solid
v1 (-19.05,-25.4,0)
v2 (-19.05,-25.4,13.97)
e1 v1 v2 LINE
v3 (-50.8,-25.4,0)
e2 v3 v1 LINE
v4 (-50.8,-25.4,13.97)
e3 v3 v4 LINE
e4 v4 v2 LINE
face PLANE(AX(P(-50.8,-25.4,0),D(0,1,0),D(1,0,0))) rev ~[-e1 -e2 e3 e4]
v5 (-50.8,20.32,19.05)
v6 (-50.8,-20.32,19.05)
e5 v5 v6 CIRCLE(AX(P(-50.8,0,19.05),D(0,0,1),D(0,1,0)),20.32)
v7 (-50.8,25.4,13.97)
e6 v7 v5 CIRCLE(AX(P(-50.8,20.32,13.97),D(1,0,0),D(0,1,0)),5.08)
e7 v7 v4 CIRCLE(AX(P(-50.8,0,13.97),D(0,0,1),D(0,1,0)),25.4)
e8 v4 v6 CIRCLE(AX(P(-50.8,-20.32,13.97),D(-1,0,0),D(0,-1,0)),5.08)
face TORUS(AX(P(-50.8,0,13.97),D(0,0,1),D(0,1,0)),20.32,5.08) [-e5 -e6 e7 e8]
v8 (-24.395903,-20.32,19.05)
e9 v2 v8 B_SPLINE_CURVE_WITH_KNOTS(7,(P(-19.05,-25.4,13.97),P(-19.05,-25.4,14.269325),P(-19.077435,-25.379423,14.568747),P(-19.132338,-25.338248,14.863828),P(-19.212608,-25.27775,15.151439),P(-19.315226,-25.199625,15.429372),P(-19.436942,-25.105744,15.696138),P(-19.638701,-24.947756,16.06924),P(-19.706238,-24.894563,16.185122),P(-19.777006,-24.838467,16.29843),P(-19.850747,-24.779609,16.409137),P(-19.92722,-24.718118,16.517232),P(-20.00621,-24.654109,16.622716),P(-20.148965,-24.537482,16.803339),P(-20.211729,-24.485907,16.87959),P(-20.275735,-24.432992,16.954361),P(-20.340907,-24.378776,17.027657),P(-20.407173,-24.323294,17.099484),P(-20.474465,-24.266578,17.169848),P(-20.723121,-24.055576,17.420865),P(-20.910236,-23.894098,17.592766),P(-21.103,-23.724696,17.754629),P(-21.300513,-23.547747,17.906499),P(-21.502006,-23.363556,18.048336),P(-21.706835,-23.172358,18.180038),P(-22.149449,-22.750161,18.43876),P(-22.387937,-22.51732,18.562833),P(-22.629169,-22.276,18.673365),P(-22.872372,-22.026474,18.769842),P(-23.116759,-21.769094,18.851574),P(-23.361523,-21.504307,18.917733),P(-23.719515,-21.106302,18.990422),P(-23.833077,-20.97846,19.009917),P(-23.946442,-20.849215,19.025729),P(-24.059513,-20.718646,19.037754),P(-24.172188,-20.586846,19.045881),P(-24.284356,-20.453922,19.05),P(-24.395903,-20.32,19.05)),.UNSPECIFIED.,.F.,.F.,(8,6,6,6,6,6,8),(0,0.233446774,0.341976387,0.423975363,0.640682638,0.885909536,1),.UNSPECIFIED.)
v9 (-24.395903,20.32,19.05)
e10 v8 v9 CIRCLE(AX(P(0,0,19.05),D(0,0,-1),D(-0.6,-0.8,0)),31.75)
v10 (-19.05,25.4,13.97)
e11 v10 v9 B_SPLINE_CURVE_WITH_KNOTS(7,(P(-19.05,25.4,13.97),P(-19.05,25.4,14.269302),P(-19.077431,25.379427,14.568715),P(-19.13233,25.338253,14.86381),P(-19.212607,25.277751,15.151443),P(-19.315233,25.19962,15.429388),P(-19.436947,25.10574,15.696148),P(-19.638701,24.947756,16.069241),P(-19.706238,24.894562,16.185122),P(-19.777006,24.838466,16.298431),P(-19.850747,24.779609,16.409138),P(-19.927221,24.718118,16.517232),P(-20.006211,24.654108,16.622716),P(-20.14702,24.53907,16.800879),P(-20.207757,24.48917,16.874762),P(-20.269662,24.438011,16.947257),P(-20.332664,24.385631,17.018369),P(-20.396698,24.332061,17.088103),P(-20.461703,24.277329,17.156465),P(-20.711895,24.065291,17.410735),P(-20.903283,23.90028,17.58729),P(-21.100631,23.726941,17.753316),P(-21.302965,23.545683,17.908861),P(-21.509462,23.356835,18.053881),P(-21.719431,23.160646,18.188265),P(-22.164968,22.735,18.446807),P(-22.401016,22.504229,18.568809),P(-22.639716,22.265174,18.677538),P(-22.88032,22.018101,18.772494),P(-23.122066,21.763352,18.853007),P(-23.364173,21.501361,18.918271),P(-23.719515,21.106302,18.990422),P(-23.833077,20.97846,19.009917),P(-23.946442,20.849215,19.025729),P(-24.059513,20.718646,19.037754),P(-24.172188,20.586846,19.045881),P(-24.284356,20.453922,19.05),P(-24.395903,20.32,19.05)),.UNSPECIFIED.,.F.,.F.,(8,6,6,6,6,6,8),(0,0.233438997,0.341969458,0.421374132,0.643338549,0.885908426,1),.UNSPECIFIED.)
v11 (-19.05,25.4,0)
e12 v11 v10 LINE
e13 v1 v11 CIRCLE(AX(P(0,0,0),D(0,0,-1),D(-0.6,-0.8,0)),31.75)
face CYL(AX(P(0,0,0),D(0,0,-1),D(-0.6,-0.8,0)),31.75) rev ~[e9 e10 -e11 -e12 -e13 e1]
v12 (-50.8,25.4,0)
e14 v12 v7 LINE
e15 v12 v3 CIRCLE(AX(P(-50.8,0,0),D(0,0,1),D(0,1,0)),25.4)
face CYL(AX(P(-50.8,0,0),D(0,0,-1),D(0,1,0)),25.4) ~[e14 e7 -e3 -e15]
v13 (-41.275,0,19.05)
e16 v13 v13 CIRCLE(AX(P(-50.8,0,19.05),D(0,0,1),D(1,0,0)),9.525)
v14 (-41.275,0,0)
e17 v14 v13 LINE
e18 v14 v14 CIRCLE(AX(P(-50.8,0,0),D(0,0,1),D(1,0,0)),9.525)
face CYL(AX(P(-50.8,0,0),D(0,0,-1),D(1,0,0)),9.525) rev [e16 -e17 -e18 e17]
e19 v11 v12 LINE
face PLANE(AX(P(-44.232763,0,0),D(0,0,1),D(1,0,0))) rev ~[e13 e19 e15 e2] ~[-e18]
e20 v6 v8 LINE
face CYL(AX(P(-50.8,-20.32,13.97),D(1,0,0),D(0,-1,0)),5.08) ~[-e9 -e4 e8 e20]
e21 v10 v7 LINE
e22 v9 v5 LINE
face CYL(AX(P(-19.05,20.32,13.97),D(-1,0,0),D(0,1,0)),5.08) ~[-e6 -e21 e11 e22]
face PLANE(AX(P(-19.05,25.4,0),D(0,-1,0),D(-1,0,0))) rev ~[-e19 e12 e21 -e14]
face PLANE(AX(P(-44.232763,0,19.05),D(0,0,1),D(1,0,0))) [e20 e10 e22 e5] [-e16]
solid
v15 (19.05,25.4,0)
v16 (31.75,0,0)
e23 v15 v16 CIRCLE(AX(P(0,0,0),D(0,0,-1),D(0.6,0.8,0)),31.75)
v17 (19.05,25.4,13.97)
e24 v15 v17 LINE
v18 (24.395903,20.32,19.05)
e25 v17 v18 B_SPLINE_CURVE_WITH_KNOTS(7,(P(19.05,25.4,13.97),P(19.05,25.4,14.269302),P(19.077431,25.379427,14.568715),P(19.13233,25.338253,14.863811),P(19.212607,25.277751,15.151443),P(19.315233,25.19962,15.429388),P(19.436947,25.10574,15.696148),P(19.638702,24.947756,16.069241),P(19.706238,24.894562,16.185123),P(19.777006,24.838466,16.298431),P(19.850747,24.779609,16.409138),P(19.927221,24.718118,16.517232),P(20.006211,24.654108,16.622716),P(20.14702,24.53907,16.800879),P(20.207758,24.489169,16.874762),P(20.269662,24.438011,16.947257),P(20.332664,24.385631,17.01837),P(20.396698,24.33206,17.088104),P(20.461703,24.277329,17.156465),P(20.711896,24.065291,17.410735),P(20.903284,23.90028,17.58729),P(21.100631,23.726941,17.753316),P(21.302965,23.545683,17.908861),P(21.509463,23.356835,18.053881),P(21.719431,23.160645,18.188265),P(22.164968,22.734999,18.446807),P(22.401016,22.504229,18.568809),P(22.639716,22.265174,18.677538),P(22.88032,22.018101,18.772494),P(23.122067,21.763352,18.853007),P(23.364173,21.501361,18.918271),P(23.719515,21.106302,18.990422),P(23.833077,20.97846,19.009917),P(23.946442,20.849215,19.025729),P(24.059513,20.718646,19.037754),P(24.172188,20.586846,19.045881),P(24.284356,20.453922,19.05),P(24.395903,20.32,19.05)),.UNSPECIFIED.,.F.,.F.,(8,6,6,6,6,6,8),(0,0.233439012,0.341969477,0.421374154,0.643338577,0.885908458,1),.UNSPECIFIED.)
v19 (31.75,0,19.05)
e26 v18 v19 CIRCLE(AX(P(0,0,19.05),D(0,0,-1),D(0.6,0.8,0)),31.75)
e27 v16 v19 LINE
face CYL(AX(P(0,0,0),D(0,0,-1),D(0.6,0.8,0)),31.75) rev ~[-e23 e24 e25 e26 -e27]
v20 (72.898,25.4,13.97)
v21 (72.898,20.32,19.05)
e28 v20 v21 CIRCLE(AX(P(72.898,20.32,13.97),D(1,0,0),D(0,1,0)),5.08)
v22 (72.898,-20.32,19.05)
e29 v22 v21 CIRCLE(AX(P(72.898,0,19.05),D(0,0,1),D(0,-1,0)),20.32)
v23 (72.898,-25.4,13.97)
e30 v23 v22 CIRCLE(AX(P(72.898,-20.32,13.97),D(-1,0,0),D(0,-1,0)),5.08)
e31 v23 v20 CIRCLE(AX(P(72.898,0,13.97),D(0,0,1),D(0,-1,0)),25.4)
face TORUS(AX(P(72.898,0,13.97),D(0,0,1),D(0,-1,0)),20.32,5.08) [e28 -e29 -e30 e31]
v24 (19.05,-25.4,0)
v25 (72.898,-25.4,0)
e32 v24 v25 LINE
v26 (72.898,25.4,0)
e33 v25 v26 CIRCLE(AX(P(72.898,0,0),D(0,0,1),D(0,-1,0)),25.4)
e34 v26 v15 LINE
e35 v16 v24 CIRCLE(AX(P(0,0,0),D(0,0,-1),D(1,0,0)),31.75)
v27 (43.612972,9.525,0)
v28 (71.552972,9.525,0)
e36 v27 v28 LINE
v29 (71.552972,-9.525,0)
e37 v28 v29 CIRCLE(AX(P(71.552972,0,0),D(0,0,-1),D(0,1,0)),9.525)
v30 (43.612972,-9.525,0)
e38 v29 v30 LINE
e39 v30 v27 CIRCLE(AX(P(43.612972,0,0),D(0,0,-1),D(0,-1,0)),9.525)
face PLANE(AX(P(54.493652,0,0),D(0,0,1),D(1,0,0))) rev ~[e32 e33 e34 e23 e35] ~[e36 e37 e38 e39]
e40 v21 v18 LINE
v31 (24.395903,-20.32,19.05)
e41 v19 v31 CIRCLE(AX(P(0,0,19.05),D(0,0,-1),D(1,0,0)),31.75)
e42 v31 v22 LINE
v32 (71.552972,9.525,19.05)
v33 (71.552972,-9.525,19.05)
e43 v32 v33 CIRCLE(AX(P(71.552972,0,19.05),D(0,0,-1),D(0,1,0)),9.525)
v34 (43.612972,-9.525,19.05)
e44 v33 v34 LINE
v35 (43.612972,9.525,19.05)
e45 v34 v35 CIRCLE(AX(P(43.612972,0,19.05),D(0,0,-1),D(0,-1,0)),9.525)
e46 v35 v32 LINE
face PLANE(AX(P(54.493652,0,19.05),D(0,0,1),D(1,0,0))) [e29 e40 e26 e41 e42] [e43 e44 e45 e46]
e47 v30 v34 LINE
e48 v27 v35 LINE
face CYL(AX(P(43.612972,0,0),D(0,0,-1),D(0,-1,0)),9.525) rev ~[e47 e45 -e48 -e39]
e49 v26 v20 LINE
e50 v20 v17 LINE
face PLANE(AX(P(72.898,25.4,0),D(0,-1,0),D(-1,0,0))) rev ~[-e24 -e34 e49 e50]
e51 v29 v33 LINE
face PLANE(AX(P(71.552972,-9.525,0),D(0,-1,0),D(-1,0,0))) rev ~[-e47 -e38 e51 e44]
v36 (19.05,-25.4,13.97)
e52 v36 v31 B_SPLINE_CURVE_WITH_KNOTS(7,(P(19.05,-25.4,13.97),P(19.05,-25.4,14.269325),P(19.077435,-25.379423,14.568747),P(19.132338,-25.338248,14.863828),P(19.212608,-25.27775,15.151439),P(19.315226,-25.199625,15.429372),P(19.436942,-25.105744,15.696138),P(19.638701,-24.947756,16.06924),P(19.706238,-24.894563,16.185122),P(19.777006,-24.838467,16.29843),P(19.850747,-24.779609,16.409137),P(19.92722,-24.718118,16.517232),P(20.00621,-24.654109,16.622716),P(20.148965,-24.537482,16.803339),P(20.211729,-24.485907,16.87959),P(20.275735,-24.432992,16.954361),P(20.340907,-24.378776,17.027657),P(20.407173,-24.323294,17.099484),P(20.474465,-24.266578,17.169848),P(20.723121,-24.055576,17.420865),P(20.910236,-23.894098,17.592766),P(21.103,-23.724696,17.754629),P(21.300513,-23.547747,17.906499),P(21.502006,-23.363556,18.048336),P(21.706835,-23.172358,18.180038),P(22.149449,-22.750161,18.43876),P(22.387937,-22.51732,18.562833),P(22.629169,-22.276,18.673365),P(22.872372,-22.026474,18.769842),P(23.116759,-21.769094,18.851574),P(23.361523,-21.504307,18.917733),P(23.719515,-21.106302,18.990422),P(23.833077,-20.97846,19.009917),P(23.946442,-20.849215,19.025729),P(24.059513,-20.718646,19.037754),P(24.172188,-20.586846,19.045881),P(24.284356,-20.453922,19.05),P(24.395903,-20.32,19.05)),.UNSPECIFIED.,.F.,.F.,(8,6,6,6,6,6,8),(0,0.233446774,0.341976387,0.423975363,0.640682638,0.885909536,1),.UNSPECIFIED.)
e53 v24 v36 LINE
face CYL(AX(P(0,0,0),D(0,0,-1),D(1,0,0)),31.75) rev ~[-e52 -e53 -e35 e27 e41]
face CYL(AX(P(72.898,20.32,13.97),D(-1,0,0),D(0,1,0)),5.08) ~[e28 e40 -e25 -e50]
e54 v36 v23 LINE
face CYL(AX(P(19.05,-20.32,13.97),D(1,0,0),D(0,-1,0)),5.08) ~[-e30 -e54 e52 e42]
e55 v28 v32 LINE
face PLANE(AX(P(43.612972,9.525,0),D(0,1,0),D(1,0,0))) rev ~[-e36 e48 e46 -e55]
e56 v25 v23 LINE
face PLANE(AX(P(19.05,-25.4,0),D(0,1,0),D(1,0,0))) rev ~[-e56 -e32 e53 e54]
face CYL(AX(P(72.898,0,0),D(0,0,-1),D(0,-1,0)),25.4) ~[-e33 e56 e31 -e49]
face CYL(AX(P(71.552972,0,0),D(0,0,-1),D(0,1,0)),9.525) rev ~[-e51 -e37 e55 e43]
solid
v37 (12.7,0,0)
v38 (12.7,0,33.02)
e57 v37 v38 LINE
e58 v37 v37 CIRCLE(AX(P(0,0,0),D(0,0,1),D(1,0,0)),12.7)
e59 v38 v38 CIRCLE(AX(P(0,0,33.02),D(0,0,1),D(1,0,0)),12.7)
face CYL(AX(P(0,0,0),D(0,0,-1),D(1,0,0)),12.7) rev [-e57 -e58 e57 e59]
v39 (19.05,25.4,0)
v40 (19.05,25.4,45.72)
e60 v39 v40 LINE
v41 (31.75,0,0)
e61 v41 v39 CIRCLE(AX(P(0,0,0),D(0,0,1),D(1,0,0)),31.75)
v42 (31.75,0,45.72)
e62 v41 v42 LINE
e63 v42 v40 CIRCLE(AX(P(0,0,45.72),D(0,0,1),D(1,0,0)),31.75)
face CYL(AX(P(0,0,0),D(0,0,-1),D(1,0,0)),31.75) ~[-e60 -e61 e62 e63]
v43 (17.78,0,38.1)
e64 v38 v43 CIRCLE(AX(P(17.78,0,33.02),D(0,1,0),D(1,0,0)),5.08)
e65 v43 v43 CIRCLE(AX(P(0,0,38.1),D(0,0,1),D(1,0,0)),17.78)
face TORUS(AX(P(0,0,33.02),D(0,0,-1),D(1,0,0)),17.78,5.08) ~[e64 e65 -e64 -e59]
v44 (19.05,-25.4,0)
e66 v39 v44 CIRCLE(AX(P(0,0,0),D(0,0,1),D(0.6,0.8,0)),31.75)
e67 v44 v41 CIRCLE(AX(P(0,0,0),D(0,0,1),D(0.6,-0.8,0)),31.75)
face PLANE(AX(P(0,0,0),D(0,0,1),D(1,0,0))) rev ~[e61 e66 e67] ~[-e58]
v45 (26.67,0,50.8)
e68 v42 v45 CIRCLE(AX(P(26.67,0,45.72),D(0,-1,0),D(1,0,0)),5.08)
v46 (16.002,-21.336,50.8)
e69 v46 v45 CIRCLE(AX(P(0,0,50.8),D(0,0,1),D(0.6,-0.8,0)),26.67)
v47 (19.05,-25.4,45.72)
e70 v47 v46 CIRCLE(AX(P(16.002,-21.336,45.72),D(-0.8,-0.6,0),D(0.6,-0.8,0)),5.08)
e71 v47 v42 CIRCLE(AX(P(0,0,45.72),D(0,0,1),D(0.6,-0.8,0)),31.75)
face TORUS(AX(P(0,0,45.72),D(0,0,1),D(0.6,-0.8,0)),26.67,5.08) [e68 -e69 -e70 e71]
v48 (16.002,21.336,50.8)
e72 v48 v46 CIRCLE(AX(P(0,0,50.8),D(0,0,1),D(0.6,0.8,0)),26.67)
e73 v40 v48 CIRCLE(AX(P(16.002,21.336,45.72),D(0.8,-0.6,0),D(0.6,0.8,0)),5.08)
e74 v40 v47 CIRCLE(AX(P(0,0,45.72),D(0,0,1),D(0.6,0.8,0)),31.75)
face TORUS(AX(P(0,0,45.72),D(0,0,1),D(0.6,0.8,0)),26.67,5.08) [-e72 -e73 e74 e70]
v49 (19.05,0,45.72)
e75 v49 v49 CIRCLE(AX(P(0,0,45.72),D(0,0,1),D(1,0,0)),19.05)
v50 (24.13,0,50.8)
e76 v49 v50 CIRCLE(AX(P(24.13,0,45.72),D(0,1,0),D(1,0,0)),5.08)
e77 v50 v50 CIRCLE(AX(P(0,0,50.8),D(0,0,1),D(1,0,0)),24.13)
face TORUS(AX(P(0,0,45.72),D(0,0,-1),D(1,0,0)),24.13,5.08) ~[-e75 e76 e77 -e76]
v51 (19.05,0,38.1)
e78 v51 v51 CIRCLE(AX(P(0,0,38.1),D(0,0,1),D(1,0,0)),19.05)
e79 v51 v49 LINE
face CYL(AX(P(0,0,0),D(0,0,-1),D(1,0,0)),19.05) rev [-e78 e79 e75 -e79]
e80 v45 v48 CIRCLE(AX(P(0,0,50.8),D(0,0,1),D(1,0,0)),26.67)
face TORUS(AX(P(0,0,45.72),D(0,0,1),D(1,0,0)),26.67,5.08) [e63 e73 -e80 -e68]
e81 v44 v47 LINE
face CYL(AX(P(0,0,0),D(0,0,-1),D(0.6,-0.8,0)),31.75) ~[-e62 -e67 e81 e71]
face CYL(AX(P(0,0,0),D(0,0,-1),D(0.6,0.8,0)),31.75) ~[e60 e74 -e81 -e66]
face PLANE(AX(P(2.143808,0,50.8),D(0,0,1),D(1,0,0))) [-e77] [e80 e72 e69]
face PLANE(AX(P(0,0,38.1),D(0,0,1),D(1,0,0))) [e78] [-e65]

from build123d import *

# Parameters (mm, degrees)
F0_R     = 9.525
F1_DEPTH = 19.05
F0_R_2   = 19.05
F2_DEPTH = 50.8
F0_R_3   = 12.7
F3_DEPTH = 38.1
F4_R     = 5.08
F4_2_R   = 5.08
F4_3_R   = 5.08


# Not quite as in the source:
# - a feature names something its author has since deleted; it is built from what else it names


with BuildPart() as f1:
    # F0 (on Top) → F1 (new body)
    with BuildSketch(Plane.XY):
        with BuildLine():
            ThreePointArc((-19.05, -25.4), (-31.75, 0), (-19.05, 25.4))
            Line((-19.05, 25.4), (-50.8, 25.4))
            ThreePointArc((-50.8, 25.4), (-76.2, 0), (-50.8, -25.4))
            Line((-50.8, -25.4), (-19.05, -25.4))
        make_face()
        with Locations((-50.8, 0)):
            Circle(F0_R, mode=Mode.SUBTRACT)
    extrude(amount=F1_DEPTH)

    # F4
    f4_edges = [f1.edges().sort_by_distance(p)[0] for p in [
        (-76.2, 0, 19.05),
    ]]
    fillet(f4_edges, radius=F4_R)


with BuildPart() as f1b:
    # F0 (on Top) → F1, piece 2 (new body)
    with BuildSketch(Plane.XY):
        with BuildLine():
            ThreePointArc((19.05, 25.4), (28.3980633142, 14.1990316571), (31.75, 0))
            ThreePointArc((31.75, 0), (28.3980633142, -14.1990316571), (19.05, -25.4))
            Line((19.05, -25.4), (72.898, -25.4))
            ThreePointArc((72.898, -25.4), (98.298, 0), (72.898, 25.4))
            Line((72.898, 25.4), (19.05, 25.4))
        make_face()
        with BuildLine():
            ThreePointArc((43.6129720223, -9.525), (34.0879720223, 0), (43.6129720223, 9.525))
            Line((43.6129720223, 9.525), (71.5529720223, 9.525))
            ThreePointArc((71.5529720223, 9.525), (81.0779720223, 0), (71.5529720223, -9.525))
            Line((71.5529720223, -9.525), (43.6129720223, -9.525))
        make_face(mode=Mode.SUBTRACT)
    extrude(amount=F1_DEPTH)

    # F4#2
    f4_2_edges = [f1b.edges().sort_by_distance(p)[0] for p in [
        (98.298, 0, 19.05),
    ]]
    fillet(f4_2_edges, radius=F4_2_R)


with BuildPart() as f2:
    # F0 (on Top) → F2 (new body)
    with BuildSketch(Plane.XY):
        with BuildLine():
            ThreePointArc((19.05, -25.4), (28.3980633142, -14.1990316571), (31.75, 0))
            ThreePointArc((31.75, 0), (28.3980633142, 14.1990316571), (19.05, 25.4))
            ThreePointArc((19.05, 25.4), (0, 31.75), (-19.05, 25.4))
            ThreePointArc((-19.05, 25.4), (-31.75, 0), (-19.05, -25.4))
            ThreePointArc((-19.05, -25.4), (0, -31.75), (19.05, -25.4))
        make_face()
        Circle(F0_R_2, mode=Mode.SUBTRACT)
    extrude(amount=F2_DEPTH)

    # F0 (on Top) → F3 (join)
    with BuildSketch(Plane.XY):
        Circle(F0_R_2)
        Circle(F0_R_3, mode=Mode.SUBTRACT)
    extrude(amount=F3_DEPTH)

    # F4#3
    f4_3_edges = [f2.edges().sort_by_distance(p)[0] for p in [
        (-19.05, -25.4, 50.8),
        (-19.05, 0, 50.8),
        (-12.7, 0, 38.1),
    ]]
    fillet(f4_3_edges, radius=F4_3_R)


solid = Compound([f1.part, f1b.part, f2.part])
